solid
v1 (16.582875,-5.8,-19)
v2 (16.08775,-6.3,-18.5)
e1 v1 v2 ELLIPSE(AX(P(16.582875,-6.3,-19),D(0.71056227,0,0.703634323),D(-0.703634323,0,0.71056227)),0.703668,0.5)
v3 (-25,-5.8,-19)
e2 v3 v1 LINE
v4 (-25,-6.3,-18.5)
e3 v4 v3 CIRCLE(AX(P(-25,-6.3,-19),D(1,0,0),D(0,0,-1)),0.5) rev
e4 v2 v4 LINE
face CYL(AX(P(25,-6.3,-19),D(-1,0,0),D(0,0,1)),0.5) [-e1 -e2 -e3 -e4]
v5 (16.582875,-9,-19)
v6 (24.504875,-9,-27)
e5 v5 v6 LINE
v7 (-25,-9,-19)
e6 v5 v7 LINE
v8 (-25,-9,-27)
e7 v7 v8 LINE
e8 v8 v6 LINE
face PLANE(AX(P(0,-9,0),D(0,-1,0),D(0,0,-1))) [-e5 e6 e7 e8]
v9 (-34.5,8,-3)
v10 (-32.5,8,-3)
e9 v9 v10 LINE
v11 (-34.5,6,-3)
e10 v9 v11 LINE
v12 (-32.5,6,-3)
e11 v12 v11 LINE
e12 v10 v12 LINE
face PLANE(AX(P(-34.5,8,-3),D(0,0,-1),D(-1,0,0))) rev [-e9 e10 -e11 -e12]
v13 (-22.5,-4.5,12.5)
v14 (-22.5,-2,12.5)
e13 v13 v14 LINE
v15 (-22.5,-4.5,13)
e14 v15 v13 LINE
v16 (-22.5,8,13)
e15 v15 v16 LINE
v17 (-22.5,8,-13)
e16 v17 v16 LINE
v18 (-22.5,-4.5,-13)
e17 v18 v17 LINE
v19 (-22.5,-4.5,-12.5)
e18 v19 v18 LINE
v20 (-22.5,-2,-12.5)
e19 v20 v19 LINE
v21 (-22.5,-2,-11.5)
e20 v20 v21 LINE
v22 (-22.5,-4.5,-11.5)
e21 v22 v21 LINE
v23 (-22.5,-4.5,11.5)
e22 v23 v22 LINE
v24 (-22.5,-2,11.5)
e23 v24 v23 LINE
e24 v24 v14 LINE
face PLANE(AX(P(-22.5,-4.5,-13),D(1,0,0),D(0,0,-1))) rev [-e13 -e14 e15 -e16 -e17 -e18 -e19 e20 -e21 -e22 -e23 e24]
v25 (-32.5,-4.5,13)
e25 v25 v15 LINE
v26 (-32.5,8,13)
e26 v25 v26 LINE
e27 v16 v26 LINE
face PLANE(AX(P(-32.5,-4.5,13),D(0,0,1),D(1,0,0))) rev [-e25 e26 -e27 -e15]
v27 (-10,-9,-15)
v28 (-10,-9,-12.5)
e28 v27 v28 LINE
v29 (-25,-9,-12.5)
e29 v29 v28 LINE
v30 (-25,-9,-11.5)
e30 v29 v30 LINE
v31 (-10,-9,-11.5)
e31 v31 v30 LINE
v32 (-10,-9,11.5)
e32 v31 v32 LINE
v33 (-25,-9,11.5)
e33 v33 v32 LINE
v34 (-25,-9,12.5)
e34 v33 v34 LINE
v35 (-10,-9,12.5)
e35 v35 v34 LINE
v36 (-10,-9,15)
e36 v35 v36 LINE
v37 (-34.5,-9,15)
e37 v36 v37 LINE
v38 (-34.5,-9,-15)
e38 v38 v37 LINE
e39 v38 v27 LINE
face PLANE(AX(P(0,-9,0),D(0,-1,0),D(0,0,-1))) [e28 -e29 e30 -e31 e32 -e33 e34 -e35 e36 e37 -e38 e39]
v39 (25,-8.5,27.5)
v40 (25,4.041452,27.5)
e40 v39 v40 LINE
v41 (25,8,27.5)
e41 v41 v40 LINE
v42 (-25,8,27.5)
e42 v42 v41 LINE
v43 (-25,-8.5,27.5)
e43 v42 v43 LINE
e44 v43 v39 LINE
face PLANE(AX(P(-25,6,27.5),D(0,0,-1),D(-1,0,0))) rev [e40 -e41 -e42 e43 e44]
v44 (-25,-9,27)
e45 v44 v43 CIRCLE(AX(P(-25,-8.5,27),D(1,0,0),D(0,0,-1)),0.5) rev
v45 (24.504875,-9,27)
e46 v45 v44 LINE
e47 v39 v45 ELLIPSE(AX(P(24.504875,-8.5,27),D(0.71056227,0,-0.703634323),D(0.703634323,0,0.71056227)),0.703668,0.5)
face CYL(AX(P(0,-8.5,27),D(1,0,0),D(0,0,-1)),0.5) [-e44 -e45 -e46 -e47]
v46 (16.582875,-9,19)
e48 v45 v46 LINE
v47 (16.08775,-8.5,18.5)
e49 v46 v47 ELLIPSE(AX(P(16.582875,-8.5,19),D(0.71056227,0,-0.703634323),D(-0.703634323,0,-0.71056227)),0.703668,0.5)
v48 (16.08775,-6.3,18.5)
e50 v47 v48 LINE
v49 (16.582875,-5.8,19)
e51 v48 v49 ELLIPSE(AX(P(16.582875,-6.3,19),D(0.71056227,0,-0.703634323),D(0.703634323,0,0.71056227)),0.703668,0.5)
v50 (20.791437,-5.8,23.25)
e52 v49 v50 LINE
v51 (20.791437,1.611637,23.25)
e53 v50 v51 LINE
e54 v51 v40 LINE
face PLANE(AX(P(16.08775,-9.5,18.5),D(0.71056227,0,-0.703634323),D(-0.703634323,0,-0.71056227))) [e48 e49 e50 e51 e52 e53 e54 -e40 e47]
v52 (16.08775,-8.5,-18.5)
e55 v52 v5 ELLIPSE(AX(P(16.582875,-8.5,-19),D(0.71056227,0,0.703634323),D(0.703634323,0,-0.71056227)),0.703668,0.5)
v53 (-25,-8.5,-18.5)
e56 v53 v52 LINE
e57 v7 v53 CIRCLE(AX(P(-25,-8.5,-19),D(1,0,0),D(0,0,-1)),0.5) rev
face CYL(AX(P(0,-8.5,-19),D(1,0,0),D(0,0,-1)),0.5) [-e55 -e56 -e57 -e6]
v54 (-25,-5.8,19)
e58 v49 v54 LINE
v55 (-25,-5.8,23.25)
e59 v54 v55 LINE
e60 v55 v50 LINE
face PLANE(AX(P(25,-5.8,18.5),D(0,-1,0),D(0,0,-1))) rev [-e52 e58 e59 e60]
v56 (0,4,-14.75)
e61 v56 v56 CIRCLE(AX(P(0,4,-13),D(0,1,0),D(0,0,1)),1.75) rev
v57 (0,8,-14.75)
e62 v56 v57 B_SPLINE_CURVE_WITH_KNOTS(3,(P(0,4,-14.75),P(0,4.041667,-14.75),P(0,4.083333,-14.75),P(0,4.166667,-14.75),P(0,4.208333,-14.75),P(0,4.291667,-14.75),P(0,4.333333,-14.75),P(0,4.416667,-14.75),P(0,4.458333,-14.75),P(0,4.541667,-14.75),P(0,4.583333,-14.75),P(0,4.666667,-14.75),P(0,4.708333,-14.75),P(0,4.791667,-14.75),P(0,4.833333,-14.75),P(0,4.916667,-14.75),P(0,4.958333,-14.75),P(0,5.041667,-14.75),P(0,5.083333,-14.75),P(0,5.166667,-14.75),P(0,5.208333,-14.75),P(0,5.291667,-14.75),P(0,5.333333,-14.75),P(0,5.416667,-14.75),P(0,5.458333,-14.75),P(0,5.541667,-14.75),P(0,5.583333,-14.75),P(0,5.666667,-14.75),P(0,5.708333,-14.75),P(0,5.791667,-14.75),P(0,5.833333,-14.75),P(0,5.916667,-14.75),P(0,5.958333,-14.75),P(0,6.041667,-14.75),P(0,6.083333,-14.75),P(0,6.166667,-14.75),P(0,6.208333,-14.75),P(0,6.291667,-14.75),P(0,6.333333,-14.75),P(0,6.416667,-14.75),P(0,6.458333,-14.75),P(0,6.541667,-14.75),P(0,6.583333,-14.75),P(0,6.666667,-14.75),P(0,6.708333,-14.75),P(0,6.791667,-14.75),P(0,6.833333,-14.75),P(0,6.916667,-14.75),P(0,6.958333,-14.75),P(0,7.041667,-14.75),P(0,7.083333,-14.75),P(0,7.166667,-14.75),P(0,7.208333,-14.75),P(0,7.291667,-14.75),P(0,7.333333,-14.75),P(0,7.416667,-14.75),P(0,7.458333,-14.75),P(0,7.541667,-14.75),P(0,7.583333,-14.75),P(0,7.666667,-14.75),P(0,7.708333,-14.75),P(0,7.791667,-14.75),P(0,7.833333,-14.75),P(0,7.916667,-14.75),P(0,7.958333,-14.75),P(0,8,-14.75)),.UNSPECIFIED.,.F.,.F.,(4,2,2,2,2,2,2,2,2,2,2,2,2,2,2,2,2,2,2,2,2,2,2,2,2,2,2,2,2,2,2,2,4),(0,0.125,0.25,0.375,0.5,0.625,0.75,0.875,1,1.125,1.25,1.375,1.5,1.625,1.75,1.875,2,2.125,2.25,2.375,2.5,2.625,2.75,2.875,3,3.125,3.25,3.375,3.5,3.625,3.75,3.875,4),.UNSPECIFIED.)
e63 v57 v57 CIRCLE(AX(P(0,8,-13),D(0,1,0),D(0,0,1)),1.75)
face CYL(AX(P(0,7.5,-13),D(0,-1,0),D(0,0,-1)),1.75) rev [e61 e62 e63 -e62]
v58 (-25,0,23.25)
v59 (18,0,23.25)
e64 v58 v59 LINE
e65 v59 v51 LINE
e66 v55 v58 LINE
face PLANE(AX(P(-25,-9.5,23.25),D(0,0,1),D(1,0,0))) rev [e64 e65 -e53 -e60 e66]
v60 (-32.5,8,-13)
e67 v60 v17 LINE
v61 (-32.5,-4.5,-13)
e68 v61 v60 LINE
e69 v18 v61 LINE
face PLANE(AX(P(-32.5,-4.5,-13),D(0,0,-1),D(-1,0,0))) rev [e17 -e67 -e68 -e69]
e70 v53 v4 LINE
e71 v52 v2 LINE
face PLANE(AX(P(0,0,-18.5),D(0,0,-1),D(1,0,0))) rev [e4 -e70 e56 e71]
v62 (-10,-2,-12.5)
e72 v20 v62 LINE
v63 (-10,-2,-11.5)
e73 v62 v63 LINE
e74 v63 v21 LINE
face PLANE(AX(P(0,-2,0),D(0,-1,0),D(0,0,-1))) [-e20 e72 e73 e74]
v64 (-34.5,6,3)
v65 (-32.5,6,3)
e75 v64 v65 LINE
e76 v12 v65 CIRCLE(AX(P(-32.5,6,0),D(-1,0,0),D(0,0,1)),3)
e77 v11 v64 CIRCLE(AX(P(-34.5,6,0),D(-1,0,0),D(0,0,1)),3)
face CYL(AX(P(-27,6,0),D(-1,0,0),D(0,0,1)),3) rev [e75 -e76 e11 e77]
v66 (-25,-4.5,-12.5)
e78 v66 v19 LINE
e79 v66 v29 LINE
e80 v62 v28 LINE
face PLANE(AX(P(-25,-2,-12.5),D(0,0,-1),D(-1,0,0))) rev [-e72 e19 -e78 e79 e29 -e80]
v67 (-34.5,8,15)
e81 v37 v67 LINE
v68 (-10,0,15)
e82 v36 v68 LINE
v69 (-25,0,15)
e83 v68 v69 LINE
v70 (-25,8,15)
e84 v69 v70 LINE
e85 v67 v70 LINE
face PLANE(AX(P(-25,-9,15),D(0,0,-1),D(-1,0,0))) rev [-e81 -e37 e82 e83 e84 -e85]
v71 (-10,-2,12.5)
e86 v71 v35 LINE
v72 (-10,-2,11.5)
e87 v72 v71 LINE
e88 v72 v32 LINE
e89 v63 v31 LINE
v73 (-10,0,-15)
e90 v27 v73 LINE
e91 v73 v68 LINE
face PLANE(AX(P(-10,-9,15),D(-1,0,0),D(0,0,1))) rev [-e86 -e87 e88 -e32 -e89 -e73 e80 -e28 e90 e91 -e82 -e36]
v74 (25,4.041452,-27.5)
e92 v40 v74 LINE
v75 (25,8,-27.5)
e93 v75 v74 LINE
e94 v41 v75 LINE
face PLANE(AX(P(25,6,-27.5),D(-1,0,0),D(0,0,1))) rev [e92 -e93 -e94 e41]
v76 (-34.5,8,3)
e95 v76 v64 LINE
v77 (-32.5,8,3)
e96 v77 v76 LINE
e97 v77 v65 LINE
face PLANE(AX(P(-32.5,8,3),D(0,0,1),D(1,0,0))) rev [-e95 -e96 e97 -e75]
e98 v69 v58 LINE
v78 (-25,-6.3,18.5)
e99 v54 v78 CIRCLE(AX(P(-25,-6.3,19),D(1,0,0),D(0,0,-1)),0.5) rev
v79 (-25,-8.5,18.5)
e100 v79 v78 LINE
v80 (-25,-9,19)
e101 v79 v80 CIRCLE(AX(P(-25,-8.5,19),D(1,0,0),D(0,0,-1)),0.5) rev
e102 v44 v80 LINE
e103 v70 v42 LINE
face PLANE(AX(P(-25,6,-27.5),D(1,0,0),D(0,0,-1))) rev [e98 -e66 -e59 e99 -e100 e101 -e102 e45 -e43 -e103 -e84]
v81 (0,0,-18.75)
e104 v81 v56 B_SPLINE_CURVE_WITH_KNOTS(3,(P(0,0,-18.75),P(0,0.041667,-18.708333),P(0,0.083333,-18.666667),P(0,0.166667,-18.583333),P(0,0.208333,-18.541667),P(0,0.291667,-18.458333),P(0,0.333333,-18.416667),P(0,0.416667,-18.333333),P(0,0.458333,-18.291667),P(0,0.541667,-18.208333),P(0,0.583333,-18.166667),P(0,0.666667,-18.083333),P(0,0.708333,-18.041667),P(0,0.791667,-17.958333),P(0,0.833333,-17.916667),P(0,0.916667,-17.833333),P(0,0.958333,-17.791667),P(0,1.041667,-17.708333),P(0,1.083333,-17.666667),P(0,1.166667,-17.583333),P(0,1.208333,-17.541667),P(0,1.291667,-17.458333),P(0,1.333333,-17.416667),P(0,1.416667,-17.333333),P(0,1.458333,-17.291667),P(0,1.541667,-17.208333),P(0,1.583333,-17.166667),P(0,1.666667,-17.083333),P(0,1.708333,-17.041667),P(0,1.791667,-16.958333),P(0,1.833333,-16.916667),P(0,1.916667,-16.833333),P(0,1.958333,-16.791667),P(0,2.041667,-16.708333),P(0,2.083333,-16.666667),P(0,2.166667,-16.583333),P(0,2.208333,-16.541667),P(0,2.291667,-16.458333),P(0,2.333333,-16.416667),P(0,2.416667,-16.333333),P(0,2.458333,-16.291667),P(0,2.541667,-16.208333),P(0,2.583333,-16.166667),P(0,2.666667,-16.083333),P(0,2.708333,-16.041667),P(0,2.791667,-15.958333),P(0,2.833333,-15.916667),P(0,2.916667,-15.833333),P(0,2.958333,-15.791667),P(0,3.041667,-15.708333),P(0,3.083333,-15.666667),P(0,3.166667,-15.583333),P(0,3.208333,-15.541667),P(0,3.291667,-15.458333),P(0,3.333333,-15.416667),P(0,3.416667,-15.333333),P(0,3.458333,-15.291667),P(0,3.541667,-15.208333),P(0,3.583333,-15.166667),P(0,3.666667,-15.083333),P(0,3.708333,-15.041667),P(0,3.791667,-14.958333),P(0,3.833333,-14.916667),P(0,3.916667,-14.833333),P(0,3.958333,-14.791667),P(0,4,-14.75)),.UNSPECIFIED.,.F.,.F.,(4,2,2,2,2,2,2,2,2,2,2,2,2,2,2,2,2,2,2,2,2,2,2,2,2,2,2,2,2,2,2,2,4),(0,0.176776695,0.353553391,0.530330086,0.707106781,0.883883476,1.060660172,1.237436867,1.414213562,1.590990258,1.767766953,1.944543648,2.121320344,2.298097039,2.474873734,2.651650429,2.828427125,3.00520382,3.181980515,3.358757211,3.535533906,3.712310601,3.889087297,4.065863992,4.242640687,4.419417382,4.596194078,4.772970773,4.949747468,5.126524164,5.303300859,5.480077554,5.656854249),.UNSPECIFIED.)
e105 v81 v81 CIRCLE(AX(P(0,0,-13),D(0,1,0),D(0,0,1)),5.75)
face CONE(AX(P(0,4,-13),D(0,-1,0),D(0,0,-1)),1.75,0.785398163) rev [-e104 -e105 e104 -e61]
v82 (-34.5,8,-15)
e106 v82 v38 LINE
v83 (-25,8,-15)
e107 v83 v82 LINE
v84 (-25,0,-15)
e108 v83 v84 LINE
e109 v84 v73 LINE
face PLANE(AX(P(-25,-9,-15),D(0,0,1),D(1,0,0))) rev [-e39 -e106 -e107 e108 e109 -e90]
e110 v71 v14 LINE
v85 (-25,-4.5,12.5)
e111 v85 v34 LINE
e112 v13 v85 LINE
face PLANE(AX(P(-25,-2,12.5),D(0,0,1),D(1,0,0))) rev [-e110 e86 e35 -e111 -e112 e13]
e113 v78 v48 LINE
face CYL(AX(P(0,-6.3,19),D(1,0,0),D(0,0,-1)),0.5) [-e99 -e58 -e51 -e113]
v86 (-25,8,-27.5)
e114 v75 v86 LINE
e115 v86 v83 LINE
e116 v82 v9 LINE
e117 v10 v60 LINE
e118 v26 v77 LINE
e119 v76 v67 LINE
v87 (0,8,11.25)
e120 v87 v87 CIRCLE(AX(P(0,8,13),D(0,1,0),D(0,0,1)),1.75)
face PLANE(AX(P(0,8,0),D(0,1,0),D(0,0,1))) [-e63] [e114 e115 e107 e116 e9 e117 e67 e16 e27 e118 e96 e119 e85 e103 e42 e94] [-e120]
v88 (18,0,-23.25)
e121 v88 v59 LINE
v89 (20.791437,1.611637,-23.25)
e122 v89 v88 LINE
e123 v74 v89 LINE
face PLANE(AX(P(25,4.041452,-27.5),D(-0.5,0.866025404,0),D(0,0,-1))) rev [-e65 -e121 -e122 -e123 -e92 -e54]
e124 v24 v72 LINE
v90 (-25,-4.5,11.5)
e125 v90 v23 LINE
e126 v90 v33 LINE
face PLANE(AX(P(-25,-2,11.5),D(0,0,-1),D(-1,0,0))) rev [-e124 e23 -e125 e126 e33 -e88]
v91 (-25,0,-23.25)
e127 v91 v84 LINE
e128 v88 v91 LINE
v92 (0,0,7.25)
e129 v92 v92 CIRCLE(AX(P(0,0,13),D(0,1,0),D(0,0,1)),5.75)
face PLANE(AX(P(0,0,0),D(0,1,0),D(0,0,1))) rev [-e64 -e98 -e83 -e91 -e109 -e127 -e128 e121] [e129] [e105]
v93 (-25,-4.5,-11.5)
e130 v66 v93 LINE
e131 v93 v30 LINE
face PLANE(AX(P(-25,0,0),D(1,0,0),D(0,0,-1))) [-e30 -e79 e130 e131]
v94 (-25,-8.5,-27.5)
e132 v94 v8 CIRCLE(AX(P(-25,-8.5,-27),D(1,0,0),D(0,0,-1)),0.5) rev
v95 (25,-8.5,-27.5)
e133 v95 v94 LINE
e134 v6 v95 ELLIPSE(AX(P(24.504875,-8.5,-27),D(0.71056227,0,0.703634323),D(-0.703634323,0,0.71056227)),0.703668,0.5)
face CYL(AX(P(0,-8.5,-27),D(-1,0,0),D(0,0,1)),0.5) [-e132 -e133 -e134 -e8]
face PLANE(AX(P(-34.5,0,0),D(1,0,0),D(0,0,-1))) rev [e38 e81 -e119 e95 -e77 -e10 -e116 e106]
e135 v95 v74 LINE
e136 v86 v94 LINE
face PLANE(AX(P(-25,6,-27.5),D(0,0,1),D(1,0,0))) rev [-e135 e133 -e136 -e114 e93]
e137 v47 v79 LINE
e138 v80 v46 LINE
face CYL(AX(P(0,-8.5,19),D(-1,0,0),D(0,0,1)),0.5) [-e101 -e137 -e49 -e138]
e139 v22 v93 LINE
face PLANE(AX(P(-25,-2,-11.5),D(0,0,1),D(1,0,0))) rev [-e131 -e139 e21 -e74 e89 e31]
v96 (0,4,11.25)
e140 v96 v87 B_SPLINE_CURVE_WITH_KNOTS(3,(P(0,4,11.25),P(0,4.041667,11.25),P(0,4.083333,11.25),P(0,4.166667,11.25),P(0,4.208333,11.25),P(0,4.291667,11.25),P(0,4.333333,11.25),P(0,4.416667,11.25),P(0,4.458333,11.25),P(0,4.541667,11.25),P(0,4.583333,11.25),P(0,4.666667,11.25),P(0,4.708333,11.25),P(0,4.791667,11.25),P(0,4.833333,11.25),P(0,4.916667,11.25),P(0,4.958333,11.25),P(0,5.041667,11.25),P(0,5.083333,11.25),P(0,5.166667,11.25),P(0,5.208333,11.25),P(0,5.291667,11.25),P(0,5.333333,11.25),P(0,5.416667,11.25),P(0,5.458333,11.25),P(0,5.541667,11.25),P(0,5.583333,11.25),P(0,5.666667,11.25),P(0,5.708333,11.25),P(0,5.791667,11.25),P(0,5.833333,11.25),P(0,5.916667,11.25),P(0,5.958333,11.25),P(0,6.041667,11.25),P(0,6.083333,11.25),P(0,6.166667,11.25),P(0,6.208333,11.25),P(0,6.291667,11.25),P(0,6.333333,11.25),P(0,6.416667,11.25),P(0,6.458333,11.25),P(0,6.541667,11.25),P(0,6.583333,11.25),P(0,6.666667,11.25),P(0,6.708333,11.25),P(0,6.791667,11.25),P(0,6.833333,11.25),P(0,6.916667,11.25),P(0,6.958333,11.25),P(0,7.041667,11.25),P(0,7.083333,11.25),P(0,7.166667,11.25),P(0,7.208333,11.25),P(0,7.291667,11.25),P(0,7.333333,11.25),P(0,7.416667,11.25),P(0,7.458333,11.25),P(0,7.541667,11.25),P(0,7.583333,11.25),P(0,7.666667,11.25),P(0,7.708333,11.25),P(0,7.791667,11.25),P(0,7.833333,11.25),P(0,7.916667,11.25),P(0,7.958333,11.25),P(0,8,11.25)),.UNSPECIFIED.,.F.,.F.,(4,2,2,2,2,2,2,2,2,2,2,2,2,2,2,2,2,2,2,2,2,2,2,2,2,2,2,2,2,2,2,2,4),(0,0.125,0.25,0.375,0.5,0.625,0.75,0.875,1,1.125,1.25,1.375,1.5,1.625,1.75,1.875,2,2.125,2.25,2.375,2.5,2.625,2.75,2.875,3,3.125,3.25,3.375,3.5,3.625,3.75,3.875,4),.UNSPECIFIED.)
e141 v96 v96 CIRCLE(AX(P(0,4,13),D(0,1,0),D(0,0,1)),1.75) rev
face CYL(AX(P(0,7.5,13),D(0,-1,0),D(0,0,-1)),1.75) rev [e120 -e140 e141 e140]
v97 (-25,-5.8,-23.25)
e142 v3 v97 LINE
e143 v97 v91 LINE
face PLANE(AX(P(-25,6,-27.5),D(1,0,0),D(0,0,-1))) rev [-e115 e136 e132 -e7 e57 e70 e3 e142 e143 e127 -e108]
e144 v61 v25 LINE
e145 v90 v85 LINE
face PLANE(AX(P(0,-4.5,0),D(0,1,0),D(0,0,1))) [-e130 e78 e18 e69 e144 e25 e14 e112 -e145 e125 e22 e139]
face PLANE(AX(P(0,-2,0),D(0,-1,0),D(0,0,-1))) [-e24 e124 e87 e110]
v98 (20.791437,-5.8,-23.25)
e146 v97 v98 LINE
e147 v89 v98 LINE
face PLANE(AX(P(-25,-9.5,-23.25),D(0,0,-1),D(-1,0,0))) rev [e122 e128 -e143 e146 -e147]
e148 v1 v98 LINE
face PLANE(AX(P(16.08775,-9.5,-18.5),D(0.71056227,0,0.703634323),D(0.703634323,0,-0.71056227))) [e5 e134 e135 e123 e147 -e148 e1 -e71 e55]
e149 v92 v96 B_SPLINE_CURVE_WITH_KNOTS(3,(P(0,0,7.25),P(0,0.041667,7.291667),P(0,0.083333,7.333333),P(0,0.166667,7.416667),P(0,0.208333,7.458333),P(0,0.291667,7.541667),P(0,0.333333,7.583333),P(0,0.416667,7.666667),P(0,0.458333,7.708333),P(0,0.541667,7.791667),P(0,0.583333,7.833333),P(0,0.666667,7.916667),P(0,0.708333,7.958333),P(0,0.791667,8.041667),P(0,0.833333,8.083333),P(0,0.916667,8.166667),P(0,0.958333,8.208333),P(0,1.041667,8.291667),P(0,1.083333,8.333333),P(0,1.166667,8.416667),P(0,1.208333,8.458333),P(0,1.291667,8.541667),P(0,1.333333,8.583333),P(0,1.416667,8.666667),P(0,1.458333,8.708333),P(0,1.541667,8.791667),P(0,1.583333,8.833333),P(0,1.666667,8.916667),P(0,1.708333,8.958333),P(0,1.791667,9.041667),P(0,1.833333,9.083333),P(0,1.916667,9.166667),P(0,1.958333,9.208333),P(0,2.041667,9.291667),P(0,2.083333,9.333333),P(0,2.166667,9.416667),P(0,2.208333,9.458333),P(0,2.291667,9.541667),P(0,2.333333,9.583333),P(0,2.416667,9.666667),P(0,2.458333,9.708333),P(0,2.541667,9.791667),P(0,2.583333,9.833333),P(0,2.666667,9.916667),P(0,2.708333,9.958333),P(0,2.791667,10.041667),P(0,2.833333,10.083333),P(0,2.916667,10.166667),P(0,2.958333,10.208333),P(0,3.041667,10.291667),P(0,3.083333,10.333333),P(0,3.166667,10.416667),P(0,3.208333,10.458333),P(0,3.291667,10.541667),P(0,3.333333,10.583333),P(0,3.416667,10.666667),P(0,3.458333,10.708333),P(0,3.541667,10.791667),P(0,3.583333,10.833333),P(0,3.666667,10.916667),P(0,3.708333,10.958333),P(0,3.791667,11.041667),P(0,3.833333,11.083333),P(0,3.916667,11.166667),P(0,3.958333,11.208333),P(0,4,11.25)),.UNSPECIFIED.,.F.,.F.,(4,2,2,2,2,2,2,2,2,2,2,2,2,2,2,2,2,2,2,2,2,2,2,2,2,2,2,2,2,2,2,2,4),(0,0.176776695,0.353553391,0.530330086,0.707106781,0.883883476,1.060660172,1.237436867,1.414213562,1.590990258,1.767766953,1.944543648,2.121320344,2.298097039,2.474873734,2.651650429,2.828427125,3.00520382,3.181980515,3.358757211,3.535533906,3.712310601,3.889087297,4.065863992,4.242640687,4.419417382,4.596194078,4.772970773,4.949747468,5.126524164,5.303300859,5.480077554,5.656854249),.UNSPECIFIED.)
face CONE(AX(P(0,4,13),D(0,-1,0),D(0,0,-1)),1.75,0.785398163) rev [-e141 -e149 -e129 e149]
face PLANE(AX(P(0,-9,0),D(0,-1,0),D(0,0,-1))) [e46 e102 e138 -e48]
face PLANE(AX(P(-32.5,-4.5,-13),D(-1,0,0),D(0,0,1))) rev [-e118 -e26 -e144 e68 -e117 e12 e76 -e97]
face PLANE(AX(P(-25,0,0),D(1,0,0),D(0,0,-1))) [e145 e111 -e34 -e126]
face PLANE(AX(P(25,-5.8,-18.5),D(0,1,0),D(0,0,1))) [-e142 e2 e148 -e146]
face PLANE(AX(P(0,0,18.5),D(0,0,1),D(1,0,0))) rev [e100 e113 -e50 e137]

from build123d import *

# Parameters (mm, degrees)
SKETCH_1_W          = 50
SKETCH_1_H          = 55
EXTRUDE_1_DEPTH     = 6
SKETCH_2_W          = 15
SKETCH_2_H          = 30
EXTRUDE_2_DEPTH     = 9
SKETCH_3_W          = 15
SKETCH_3_H          = 1
CUT_EXTRUDE_1_DEPTH = 7
SKETCH_4_W          = 50
SKETCH_4_H          = 4.25
EXTRUDE_3_DEPTH     = 9.5
SKETCH_5_W          = 50
SKETCH_5_H          = 3.7
EXTRUDE_4_DEPTH     = 4.75
CUT_EXTRUDE_2_DEPTH = 9.5
SKETCH_7_W          = 30
SKETCH_7_H          = 15
EXTRUDE_5_DEPTH     = 9.5
SKETCH_8_W          = 10
SKETCH_8_H          = 26
CUT_EXTRUDE_3_DEPTH = 10.5
SKETCH_9_R          = 3
CUT_EXTRUDE_4_DEPTH = 7.5
SKETCH_10_R         = 1.75
CUT_EXTRUDE_5_DEPTH = 7.5
CHAMFER_1_SIZE      = 4
SKETCH_11_R         = 1.75
EXTRUDE_6_DEPTH     = 2
SKETCH_12_W         = 89.739519214
SKETCH_12_H         = 69.095216672
CUT_EXTRUDE_6_DEPTH = 0.5
CHAMFER_2_SIZE      = 7
CHAMFER_2_SIZE_2    = 4.041451884
FILLET_1_R          = 0.5


with BuildPart() as part:
    # Эскиз1 → Бобышка-Вытянуть1 (new body)
    with BuildSketch(Plane(origin=(0, 0, 0), x_dir=(1, 0, 0), z_dir=(0, 1, 0))):
        Rectangle(SKETCH_1_W, SKETCH_1_H)
    extrude(amount=EXTRUDE_1_DEPTH)

    # Эскиз2 → Бобышка-Вытянуть2 (add)
    with BuildSketch(Plane.XZ):
        with Locations((-17.5, 0)):
            Rectangle(SKETCH_2_W, SKETCH_2_H)
    extrude(amount=EXTRUDE_2_DEPTH)

    # Эскиз3 → Вырез-Вытянуть1 (cut)
    with BuildSketch(Plane.XZ.offset(9)):
        with Locations((-17.5, 12)):
            Rectangle(SKETCH_3_W, SKETCH_3_H)
        with Locations((-17.5, -12)):
            Rectangle(SKETCH_3_W, SKETCH_3_H)
    extrude(amount=-CUT_EXTRUDE_1_DEPTH, mode=Mode.SUBTRACT)

    # Эскиз4 → Бобышка-Вытянуть3 (add)
    with BuildSketch(Plane.XZ):
        with Locations((0, -25.375)):
            Rectangle(SKETCH_4_W, SKETCH_4_H)
        with Locations((0, 25.375)):
            Rectangle(SKETCH_4_W, SKETCH_4_H)
    extrude(amount=EXTRUDE_3_DEPTH)

    # Эскиз5 → Бобышка-Вытянуть4 (add)
    with BuildSketch(Plane(origin=(0, 0, 23.25), x_dir=(-1, 0, 0), z_dir=(0, 0, -1))):
        with Locations((0, -7.65)):
            Rectangle(SKETCH_5_W, SKETCH_5_H)
    extrude_4 = extrude(amount=EXTRUDE_4_DEPTH)

    # Зеркальное отражение1: Бобышка-Вытянуть4 across plane
    add(extrude_4.mirror(Plane.XY))

    # Эскиз6 → Вырез-Вытянуть2 (cut)
    with BuildSketch(Plane.XZ):
        Polygon((16.087749561, -18.5), (25, -27.5), (25, -18.5), align=None)
        Polygon((25, 18.5), (16.087749561, 18.5), (25, 27.5), align=None)
    extrude(amount=CUT_EXTRUDE_2_DEPTH, mode=Mode.SUBTRACT)

    # Эскиз7 → Бобышка-Вытянуть5 (add)
    with BuildSketch(Plane.ZY.offset(25)):
        with Locations((0, -1.5)):
            Rectangle(SKETCH_7_W, SKETCH_7_H)
    extrude(amount=EXTRUDE_5_DEPTH)

    # Эскиз8 → Вырез-Вытянуть3 (cut)
    with BuildSketch(Plane(origin=(0, 6, 0), x_dir=(1, 0, 0), z_dir=(0, 1, 0))):
        with Locations((-27.5, 0)):
            Rectangle(SKETCH_8_W, SKETCH_8_H)
    extrude(amount=-CUT_EXTRUDE_3_DEPTH, mode=Mode.SUBTRACT)

    # Эскиз9 → Вырез-Вытянуть4 (cut)
    with BuildSketch(Plane.ZY.offset(34.5)):
        with Locations((0, 6)):
            Circle(SKETCH_9_R)
    extrude(amount=-CUT_EXTRUDE_4_DEPTH, mode=Mode.SUBTRACT)

    # Эскиз10 → Вырез-Вытянуть5 (cut)
    with BuildSketch(Plane.XZ):
        with Locations(Location((0, 13, 0), (0, 0, 270))):
            Circle(SKETCH_10_R)
        with Locations(Location((0, -13, 0), (0, 0, 270))):
            Circle(SKETCH_10_R)
    extrude(amount=-CUT_EXTRUDE_5_DEPTH, mode=Mode.SUBTRACT)

    # Фаска1
    chamfer_1_edges = [part.edges().sort_by_distance(p)[0] for p in [
        (0, 0, 14.75),
        (0, 0, -11.25),
    ]]
    chamfer(chamfer_1_edges, length=CHAMFER_1_SIZE)

    # Эскиз11 → Бобышка-Вытянуть6 (add)
    with BuildSketch(Plane(origin=(0, 6, 0), x_dir=(1, 0, 0), z_dir=(0, 1, 0))):
        Polygon((-34.5, 3), (-32.5, 3), (-32.5, 13), (-22.5, 13), (-22.5, -13), (-32.5, -13), (-32.5, -3), (-34.5, -3), (-34.5, -15), (-25, -15), (-25, -27.5), (25, -27.5), (25, 27.5), (-25, 27.5), (-25, 15), (-34.5, 15), align=None)
        with Locations(Location((0, 13, 0), (0, 0, 90))):
            Circle(SKETCH_11_R, mode=Mode.SUBTRACT)
        with Locations(Location((0, -13, 0), (0, 0, 90))):
            Circle(SKETCH_11_R, mode=Mode.SUBTRACT)
    extrude(amount=EXTRUDE_6_DEPTH)

    # Эскиз12 → Вырез-Вытянуть6 (cut)
    with BuildSketch(Plane.XZ.offset(9.5)):
        with Locations((1.274872697, 1.26393689)):
            Rectangle(SKETCH_12_W, SKETCH_12_H)
    extrude(amount=-CUT_EXTRUDE_6_DEPTH, mode=Mode.SUBTRACT)

    # Фаска2
    # the kernel refuses this chamfer: 7, 4.041451884 mm, written as the material it takes off along each edge
    with BuildSketch(Plane(origin=(25, 0, 45.609600283), x_dir=(-0.9998132206222079, -0.019326765612700747, 0), z_dir=(0, 0, -1))) as chamfer_2_piece_1_section:
        Polygon((CHAMFER_2_SIZE * 0.999813220622, CHAMFER_2_SIZE * 0.0193267656127), (-CHAMFER_2_SIZE_2 * 0.0193267656143, CHAMFER_2_SIZE_2 * 0.999813220703), (0, 0), align=None)
    chamfer_2_piece_1 = extrude(amount=91.219200565, mode=Mode.PRIVATE)
    chamfer_2_piece_1 = split(chamfer_2_piece_1, bisect_by=Plane(origin=(23.020268738, 1.666507019, 25.500776405), z_dir=(0.7105622702047159, 0, -0.7036343227568711)), keep=Keep.TOP, mode=Mode.PRIVATE)
    chamfer_2_piece_1 = split(chamfer_2_piece_1, bisect_by=Plane(origin=(23.772949655, 1.666507019, -23.25), z_dir=(0, 0, 1)), keep=Keep.TOP, mode=Mode.PRIVATE)
    add(chamfer_2_piece_1, mode=Mode.SUBTRACT)
    with BuildSketch(Plane(origin=(25, 0, 45.609600283), x_dir=(-0.9998132206222079, -0.019326765612700747, 0), z_dir=(0, 0, -1))) as chamfer_2_piece_2_section:
        Polygon((CHAMFER_2_SIZE * 0.999813220622, CHAMFER_2_SIZE * 0.0193267656127), (-CHAMFER_2_SIZE_2 * 0.0193267656143, CHAMFER_2_SIZE_2 * 0.999813220703), (0, 0), align=None)
    chamfer_2_piece_2 = extrude(amount=91.219200565, mode=Mode.PRIVATE)
    chamfer_2_piece_2 = split(chamfer_2_piece_2, bisect_by=Plane(origin=(-2.796120558, 0.402909268, 0.569799735), z_dir=(0.7105622702047159, 0, 0.7036343227568711)), keep=Keep.TOP, mode=Mode.PRIVATE)
    chamfer_2_piece_2 = split(chamfer_2_piece_2, bisect_by=Plane(origin=(19.395718646, 0.402909268, 23.25), z_dir=(0, 0, -1)), keep=Keep.TOP, mode=Mode.PRIVATE)
    add(chamfer_2_piece_2, mode=Mode.SUBTRACT)

    # Скругление1
    fillet_1_edges = [part.edges().sort_by_distance(p)[0] for p in [
        (0, -9, 27.5),
        (-4.45612522, -9, 18.5),
        (-4.45612522, -9, -18.5),
        (0, -9, -27.5),
        (-4.45612522, -5.8, 18.5),
        (-4.45612522, -5.8, -18.5),
    ]]
    fillet(fillet_1_edges, radius=FILLET_1_R)


solid = part.part
